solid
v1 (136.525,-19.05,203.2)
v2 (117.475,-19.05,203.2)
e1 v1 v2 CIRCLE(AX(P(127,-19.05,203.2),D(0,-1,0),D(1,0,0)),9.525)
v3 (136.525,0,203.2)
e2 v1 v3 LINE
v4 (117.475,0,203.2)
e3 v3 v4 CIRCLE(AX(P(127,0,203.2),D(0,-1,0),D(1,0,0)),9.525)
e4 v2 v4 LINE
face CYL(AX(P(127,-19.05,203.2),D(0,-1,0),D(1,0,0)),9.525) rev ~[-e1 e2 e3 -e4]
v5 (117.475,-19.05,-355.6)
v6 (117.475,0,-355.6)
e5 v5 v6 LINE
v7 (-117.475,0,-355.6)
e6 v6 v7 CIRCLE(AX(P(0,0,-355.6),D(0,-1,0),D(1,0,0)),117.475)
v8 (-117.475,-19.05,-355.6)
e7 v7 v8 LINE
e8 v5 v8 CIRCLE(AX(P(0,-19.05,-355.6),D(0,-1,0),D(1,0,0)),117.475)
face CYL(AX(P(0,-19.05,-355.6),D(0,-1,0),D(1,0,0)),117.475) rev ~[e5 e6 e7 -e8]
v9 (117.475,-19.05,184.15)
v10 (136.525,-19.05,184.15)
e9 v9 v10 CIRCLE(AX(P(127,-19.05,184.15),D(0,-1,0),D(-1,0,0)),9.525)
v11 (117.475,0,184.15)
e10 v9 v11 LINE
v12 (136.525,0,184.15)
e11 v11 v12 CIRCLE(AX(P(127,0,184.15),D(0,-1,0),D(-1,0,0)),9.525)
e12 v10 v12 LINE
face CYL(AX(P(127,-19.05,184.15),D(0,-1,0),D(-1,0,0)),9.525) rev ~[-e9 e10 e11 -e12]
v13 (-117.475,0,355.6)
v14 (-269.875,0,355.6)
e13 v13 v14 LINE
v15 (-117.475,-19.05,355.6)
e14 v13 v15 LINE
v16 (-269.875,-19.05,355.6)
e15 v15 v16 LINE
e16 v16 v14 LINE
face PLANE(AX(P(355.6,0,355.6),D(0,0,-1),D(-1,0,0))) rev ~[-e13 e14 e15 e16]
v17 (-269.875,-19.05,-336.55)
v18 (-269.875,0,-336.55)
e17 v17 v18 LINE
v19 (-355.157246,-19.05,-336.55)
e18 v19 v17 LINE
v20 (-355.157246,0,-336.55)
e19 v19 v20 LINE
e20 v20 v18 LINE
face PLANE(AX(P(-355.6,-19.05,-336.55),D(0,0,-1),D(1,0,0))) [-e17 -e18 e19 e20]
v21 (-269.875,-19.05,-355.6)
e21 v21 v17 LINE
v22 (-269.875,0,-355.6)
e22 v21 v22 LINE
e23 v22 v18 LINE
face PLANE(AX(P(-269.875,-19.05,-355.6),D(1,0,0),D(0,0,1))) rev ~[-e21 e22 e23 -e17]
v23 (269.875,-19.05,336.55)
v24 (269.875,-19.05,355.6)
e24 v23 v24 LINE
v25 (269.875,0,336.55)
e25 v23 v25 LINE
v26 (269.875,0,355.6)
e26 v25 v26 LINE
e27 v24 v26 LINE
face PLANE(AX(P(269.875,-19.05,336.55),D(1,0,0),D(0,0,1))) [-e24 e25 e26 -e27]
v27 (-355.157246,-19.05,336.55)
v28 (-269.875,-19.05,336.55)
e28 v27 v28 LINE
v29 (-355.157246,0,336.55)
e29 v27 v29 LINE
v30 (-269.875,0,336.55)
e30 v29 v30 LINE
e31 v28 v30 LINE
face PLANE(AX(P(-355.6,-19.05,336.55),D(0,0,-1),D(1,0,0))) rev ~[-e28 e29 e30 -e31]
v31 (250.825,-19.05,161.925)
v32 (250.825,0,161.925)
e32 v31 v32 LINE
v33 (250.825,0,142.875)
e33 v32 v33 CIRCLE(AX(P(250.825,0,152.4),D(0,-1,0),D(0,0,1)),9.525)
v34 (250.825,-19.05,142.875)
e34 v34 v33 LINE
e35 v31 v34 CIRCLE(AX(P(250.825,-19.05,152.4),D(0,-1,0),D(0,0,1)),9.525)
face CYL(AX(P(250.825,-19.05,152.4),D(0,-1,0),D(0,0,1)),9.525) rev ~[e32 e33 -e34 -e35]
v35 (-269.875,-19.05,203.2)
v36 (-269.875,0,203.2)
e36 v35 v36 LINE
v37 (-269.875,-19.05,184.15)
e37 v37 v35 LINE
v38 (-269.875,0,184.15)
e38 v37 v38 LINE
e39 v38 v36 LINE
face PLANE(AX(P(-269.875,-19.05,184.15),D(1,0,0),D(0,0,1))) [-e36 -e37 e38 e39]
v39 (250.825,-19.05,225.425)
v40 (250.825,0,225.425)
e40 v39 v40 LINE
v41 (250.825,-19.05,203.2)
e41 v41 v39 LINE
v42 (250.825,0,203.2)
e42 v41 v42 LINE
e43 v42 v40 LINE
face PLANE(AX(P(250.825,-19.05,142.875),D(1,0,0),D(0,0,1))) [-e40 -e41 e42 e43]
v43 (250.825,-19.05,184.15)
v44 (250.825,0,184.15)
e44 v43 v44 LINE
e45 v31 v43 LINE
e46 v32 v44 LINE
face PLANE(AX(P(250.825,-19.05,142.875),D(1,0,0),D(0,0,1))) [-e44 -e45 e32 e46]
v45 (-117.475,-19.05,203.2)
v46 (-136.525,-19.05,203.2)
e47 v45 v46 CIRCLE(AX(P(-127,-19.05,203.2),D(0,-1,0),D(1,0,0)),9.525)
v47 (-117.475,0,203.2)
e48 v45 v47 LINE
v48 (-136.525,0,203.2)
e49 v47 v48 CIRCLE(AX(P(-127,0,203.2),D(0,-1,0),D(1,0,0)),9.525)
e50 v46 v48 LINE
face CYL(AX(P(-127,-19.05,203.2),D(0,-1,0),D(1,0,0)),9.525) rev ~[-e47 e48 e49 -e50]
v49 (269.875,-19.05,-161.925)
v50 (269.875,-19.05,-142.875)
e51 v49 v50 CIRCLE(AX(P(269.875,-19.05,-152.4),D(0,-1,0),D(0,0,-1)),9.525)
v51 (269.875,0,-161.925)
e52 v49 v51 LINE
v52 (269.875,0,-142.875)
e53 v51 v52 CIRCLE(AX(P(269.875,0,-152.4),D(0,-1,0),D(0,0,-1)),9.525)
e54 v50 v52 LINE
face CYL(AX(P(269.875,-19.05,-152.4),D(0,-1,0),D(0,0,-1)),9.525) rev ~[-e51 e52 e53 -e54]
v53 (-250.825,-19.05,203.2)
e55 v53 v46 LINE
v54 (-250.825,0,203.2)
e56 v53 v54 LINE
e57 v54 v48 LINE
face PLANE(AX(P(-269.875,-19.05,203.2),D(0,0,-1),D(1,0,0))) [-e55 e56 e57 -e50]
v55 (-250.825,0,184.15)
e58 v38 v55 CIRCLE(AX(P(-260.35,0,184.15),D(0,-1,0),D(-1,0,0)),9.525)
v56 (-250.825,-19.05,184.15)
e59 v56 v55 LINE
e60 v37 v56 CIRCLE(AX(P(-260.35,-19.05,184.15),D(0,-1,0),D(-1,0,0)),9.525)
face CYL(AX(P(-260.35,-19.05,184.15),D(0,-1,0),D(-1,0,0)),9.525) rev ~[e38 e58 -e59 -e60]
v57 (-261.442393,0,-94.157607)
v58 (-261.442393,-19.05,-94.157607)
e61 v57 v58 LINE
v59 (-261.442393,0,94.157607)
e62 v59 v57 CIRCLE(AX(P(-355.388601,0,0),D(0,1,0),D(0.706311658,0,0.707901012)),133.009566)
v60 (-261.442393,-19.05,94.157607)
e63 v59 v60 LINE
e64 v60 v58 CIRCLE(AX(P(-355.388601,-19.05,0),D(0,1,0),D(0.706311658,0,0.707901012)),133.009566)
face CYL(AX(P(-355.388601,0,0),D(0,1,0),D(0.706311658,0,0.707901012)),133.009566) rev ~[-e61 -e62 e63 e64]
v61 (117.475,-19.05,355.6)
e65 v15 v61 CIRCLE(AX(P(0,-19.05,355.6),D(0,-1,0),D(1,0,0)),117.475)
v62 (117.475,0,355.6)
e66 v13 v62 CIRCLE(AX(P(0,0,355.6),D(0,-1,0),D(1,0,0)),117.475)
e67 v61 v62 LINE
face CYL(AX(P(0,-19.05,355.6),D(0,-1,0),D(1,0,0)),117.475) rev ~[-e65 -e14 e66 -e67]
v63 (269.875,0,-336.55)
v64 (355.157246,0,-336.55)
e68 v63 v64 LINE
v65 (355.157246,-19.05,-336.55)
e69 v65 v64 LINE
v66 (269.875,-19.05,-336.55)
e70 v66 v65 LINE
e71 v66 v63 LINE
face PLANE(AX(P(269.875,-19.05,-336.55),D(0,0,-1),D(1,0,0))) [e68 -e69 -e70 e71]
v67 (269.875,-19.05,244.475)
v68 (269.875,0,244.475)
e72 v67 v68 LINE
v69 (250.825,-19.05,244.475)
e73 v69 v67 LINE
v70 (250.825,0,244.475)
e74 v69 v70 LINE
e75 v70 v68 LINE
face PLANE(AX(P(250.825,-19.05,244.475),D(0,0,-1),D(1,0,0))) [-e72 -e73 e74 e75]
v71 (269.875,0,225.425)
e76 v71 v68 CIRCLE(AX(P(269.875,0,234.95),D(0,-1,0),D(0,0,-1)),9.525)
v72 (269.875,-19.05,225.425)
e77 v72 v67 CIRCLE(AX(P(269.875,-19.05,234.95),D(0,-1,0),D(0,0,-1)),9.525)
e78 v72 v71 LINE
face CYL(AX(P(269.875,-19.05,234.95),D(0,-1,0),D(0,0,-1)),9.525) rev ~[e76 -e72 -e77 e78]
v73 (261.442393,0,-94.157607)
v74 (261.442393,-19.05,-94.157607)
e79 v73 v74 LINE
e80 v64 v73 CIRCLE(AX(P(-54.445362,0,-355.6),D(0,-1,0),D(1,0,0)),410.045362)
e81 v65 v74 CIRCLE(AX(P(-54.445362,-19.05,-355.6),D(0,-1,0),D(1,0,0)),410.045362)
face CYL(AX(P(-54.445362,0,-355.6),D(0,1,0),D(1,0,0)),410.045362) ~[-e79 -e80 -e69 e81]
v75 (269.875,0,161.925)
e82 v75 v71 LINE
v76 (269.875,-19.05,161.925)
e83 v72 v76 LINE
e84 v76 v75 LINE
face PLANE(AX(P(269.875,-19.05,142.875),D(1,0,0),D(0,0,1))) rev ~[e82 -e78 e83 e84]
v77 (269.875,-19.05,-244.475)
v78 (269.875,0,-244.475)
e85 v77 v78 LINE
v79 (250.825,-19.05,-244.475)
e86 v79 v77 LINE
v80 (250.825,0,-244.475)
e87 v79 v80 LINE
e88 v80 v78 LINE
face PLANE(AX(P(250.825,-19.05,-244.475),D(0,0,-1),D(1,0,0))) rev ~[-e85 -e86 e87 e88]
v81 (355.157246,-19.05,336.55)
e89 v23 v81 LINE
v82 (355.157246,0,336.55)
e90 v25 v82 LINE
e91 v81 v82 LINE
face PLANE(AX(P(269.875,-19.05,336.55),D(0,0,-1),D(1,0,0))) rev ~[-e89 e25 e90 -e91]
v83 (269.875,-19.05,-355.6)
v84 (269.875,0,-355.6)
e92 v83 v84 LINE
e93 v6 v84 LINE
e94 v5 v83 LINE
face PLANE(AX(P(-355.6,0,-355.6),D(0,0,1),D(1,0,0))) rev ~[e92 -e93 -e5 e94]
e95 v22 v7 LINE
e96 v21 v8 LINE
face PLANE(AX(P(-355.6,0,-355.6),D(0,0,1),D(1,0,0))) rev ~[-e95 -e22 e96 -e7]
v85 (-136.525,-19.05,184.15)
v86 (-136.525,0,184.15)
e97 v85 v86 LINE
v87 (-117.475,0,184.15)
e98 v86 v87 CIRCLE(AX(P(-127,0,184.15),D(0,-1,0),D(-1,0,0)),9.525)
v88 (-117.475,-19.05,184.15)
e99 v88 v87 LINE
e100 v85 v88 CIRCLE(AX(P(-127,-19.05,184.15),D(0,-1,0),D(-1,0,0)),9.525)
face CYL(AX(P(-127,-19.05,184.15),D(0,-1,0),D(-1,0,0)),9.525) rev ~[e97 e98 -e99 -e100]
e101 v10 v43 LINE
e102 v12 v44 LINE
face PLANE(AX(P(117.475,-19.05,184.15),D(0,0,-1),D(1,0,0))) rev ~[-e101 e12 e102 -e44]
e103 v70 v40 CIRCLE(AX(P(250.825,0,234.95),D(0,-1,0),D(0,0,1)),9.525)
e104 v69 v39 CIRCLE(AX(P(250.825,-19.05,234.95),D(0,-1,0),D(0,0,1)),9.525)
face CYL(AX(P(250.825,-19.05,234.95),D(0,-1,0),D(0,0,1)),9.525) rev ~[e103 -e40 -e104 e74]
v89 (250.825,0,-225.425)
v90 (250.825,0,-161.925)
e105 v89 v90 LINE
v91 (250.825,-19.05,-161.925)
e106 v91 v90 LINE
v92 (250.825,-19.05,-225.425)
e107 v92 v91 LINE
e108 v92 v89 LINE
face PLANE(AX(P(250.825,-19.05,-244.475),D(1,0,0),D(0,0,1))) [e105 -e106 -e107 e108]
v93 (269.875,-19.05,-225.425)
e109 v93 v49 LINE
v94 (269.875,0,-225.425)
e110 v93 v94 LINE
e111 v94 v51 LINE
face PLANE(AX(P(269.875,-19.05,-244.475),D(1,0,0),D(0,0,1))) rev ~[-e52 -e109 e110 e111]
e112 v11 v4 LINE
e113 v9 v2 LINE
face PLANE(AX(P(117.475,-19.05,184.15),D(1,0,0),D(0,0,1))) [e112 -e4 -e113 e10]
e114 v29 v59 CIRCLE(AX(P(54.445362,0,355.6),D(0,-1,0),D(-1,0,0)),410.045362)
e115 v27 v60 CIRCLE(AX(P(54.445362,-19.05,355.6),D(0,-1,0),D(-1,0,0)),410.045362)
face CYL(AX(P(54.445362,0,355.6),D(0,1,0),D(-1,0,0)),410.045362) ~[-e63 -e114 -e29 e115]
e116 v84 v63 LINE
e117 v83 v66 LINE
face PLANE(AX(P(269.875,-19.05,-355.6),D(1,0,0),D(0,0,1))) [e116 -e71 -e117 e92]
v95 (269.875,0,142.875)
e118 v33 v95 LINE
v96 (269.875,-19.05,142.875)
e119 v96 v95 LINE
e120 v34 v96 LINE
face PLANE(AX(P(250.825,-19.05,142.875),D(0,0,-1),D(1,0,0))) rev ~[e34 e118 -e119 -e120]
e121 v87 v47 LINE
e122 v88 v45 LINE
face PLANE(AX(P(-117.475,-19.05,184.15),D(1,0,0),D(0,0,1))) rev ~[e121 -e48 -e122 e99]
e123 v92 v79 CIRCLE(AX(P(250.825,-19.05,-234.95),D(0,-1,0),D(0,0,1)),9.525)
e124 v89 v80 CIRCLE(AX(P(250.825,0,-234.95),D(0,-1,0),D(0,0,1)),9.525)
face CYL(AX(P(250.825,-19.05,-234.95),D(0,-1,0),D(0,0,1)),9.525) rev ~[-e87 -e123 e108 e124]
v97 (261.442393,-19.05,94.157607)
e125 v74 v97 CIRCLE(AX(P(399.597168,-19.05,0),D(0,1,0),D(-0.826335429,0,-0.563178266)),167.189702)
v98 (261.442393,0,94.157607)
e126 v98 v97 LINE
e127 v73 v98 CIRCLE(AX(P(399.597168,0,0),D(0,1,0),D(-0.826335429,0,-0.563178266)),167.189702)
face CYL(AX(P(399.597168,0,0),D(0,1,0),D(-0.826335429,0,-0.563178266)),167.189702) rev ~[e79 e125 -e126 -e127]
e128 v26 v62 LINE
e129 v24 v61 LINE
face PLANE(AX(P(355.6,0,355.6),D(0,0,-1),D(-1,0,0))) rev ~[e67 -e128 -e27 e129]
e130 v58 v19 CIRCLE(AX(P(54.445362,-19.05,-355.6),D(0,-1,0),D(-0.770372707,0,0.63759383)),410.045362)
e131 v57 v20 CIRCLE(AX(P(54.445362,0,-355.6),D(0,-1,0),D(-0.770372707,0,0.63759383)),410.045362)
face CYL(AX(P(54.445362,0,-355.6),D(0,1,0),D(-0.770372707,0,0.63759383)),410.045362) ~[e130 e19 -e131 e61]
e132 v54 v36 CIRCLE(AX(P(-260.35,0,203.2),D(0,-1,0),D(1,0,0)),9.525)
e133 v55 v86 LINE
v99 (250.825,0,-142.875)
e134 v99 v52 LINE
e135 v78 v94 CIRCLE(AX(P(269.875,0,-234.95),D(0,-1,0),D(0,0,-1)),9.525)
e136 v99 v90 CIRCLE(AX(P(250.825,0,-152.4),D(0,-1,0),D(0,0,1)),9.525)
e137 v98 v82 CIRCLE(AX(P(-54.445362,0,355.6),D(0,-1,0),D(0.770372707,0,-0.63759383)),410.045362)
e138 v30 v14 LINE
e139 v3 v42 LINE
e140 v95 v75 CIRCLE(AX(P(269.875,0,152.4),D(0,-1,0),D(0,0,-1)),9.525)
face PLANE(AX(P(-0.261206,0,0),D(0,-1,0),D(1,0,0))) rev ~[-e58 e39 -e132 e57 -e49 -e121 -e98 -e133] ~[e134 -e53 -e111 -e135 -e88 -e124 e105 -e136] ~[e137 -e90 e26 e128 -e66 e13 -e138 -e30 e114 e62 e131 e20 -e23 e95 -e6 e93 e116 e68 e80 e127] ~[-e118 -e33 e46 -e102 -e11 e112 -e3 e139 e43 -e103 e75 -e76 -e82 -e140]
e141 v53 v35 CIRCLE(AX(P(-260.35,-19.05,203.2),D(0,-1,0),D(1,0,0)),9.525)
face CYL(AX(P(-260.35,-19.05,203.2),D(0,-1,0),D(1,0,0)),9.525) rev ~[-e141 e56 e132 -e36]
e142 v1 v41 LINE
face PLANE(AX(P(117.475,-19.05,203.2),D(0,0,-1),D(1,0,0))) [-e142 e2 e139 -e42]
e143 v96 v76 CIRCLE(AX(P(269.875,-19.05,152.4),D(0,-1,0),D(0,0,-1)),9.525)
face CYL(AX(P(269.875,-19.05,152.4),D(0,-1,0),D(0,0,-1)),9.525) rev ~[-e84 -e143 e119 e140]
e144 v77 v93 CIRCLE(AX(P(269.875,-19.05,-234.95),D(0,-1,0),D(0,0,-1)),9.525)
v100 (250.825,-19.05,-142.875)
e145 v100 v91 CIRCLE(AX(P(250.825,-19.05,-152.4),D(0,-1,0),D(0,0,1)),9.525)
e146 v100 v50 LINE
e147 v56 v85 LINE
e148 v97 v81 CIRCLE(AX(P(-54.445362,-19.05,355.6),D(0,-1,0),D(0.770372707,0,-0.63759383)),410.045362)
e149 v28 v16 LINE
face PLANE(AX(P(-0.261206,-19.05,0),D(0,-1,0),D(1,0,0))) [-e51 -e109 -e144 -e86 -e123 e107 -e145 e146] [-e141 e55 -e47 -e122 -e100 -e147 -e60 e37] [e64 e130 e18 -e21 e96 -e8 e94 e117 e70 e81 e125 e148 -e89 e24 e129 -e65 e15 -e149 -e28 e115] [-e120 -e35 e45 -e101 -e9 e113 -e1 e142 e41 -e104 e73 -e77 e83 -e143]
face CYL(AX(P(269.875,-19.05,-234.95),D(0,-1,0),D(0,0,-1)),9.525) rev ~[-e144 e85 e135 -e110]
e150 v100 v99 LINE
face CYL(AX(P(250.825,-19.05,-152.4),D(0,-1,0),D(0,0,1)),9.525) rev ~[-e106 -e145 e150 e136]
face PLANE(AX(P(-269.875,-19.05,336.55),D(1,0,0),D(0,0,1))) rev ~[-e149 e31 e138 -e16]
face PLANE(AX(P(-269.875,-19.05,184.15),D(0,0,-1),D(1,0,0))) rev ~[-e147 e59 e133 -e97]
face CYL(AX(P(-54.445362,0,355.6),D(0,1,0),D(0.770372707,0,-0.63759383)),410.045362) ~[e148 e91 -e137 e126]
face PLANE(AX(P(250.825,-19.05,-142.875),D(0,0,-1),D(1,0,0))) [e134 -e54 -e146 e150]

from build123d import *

# Parameters (mm, degrees)
F2_DEPTH  = 19.05
F3_W      = 85.725
F3_H      = 19.05
F3_R      = 117.475
F4_DEPTH  = 25.4
F5_W      = 152.4
F5_H      = 19.05
F6_DEPTH  = 25.4
F8_DEPTH  = 25.4
F9_W      = 19.05
F9_H      = 101.6
F10_DEPTH = 25.4
F12_DEPTH = 25.4


# Not quite as in the source:
# - a variable given as a bare number and used for a length is read in inches; the dataset says mm whatever the document's units were


with BuildPart() as f2:
    # F1 (on Front) → F2 (new body)
    with BuildSketch(Plane.XZ):
        with BuildLine():
            Line((355.6, 355.6), (203.2, 355.6))
            Line((203.2, 355.6), (-203.2, 355.6))
            Line((-203.2, 355.6), (-355.6, 355.6))
            ThreePointArc((-355.6, 355.6), (-331.3431214209, 216.6595631931), (-261.4423933195, 94.1576066805))
            ThreePointArc((-261.4423933195, 94.1576066805), (-222.3790342141, 0), (-261.4423933195, -94.1576066805))
            ThreePointArc((-261.4423933195, -94.1576066805), (-331.3431214209, -216.6595631931), (-355.6, -355.6))
            Line((-355.6, -355.6), (-203.2, -355.6))
            Line((-203.2, -355.6), (203.2, -355.6))
            Line((203.2, -355.6), (355.6, -355.6))
            ThreePointArc((355.6, -355.6), (331.3431214209, -216.6595631931), (261.4423933195, -94.1576066805))
            ThreePointArc((261.4423933195, -94.1576066805), (232.4074653208, 0), (261.4423933195, 94.1576066805))
            ThreePointArc((261.4423933195, 94.1576066805), (331.3431214209, 216.6595631931), (355.6, 355.6))
        make_face()
    extrude(amount=F2_DEPTH)

    # F3 (on face) → F4 (cut)
    with BuildSketch(Plane.XZ.offset(19.05)):
        with Locations((-312.7375, 346.075)):
            Rectangle(F3_W, F3_H)
        with Locations((312.7375, 346.075)):
            Rectangle(F3_W, F3_H)
        with Locations((312.7375, -346.075)):
            Rectangle(F3_W, F3_H)
        with Locations((-312.7375, -346.075)):
            Rectangle(F3_W, F3_H)
        with Locations((0, 355.6)):
            Circle(F3_R)
        with Locations((0, -355.6)):
            Circle(F3_R)
    extrude(amount=-F4_DEPTH, mode=Mode.SUBTRACT)

    # F5 (on face) → F6 (cut)
    with BuildSketch(Plane.XZ.offset(19.05)):
        with Locations((-193.675, 193.675)):
            Rectangle(F5_W, F5_H)
        with Locations((193.675, 193.675)):
            Rectangle(F5_W, F5_H)
    extrude(amount=-F6_DEPTH, mode=Mode.SUBTRACT)

    # F7 (on face) → F8 (cut)
    with BuildSketch(Plane.XZ.offset(19.05)):
        with BuildLine():
            Line((-250.825, 184.15), (-250.825, 203.2))
            ThreePointArc((-250.825, 203.2), (-260.35, 212.725), (-269.875, 203.2))
            Line((-269.875, 203.2), (-269.875, 184.15))
            ThreePointArc((-269.875, 184.15), (-260.35, 174.625), (-250.825, 184.15))
        make_face()
        with BuildLine():
            ThreePointArc((-117.475, 203.2), (-127, 212.725), (-136.525, 203.2))
            Line((-136.525, 203.2), (-136.525, 184.15))
            ThreePointArc((-136.525, 184.15), (-127, 174.625), (-117.475, 184.15))
            Line((-117.475, 184.15), (-117.475, 203.2))
        make_face()
        with BuildLine():
            Line((117.475, 203.2), (117.475, 184.15))
            ThreePointArc((117.475, 184.15), (127, 174.625), (136.525, 184.15))
            Line((136.525, 184.15), (136.525, 203.2))
            ThreePointArc((136.525, 203.2), (127, 212.725), (117.475, 203.2))
        make_face()
        with BuildLine():
            ThreePointArc((269.875, 203.2), (260.35, 212.725), (250.825, 203.2))
            Line((250.825, 203.2), (250.825, 184.15))
            ThreePointArc((250.825, 184.15), (260.35, 174.625), (269.875, 184.15))
            Line((269.875, 184.15), (269.875, 203.2))
        make_face()
    extrude(amount=-F8_DEPTH, mode=Mode.SUBTRACT)

    # F9 (on face) → F10 (cut)
    with BuildSketch(Plane.XZ.offset(19.05)):
        with Locations((260.35, 193.675)):
            Rectangle(F9_W, F9_H)
        with Locations((260.35, -193.675)):
            Rectangle(F9_W, F9_H)
    extrude(amount=-F10_DEPTH, mode=Mode.SUBTRACT)

    # F11 (on face) → F12 (cut)
    with BuildSketch(Plane.XZ.offset(19.05)):
        with BuildLine():
            Line((269.875, 244.475), (250.825, 244.475))
            ThreePointArc((250.825, 244.475), (241.3, 234.95), (250.825, 225.425))
            Line((250.825, 225.425), (269.875, 225.425))
            ThreePointArc((269.875, 225.425), (279.4, 234.95), (269.875, 244.475))
        make_face()
        with BuildLine():
            ThreePointArc((269.875, 142.875), (279.4, 152.4), (269.875, 161.925))
            Line((269.875, 161.925), (250.825, 161.925))
            ThreePointArc((250.825, 161.925), (241.3, 152.4), (250.825, 142.875))
            Line((250.825, 142.875), (269.875, 142.875))
        make_face()
        with BuildLine():
            Line((269.875, -142.875), (250.825, -142.875))
            ThreePointArc((250.825, -142.875), (241.3, -152.4), (250.825, -161.925))
            Line((250.825, -161.925), (269.875, -161.925))
            ThreePointArc((269.875, -161.925), (279.4, -152.4), (269.875, -142.875))
        make_face()
        with BuildLine():
            ThreePointArc((250.825, -225.425), (241.3, -234.95), (250.825, -244.475))
            Line((250.825, -244.475), (269.875, -244.475))
            ThreePointArc((269.875, -244.475), (279.4, -234.95), (269.875, -225.425))
            Line((269.875, -225.425), (250.825, -225.425))
        make_face()
    extrude(amount=-F12_DEPTH, mode=Mode.SUBTRACT)


solid = f2.part
